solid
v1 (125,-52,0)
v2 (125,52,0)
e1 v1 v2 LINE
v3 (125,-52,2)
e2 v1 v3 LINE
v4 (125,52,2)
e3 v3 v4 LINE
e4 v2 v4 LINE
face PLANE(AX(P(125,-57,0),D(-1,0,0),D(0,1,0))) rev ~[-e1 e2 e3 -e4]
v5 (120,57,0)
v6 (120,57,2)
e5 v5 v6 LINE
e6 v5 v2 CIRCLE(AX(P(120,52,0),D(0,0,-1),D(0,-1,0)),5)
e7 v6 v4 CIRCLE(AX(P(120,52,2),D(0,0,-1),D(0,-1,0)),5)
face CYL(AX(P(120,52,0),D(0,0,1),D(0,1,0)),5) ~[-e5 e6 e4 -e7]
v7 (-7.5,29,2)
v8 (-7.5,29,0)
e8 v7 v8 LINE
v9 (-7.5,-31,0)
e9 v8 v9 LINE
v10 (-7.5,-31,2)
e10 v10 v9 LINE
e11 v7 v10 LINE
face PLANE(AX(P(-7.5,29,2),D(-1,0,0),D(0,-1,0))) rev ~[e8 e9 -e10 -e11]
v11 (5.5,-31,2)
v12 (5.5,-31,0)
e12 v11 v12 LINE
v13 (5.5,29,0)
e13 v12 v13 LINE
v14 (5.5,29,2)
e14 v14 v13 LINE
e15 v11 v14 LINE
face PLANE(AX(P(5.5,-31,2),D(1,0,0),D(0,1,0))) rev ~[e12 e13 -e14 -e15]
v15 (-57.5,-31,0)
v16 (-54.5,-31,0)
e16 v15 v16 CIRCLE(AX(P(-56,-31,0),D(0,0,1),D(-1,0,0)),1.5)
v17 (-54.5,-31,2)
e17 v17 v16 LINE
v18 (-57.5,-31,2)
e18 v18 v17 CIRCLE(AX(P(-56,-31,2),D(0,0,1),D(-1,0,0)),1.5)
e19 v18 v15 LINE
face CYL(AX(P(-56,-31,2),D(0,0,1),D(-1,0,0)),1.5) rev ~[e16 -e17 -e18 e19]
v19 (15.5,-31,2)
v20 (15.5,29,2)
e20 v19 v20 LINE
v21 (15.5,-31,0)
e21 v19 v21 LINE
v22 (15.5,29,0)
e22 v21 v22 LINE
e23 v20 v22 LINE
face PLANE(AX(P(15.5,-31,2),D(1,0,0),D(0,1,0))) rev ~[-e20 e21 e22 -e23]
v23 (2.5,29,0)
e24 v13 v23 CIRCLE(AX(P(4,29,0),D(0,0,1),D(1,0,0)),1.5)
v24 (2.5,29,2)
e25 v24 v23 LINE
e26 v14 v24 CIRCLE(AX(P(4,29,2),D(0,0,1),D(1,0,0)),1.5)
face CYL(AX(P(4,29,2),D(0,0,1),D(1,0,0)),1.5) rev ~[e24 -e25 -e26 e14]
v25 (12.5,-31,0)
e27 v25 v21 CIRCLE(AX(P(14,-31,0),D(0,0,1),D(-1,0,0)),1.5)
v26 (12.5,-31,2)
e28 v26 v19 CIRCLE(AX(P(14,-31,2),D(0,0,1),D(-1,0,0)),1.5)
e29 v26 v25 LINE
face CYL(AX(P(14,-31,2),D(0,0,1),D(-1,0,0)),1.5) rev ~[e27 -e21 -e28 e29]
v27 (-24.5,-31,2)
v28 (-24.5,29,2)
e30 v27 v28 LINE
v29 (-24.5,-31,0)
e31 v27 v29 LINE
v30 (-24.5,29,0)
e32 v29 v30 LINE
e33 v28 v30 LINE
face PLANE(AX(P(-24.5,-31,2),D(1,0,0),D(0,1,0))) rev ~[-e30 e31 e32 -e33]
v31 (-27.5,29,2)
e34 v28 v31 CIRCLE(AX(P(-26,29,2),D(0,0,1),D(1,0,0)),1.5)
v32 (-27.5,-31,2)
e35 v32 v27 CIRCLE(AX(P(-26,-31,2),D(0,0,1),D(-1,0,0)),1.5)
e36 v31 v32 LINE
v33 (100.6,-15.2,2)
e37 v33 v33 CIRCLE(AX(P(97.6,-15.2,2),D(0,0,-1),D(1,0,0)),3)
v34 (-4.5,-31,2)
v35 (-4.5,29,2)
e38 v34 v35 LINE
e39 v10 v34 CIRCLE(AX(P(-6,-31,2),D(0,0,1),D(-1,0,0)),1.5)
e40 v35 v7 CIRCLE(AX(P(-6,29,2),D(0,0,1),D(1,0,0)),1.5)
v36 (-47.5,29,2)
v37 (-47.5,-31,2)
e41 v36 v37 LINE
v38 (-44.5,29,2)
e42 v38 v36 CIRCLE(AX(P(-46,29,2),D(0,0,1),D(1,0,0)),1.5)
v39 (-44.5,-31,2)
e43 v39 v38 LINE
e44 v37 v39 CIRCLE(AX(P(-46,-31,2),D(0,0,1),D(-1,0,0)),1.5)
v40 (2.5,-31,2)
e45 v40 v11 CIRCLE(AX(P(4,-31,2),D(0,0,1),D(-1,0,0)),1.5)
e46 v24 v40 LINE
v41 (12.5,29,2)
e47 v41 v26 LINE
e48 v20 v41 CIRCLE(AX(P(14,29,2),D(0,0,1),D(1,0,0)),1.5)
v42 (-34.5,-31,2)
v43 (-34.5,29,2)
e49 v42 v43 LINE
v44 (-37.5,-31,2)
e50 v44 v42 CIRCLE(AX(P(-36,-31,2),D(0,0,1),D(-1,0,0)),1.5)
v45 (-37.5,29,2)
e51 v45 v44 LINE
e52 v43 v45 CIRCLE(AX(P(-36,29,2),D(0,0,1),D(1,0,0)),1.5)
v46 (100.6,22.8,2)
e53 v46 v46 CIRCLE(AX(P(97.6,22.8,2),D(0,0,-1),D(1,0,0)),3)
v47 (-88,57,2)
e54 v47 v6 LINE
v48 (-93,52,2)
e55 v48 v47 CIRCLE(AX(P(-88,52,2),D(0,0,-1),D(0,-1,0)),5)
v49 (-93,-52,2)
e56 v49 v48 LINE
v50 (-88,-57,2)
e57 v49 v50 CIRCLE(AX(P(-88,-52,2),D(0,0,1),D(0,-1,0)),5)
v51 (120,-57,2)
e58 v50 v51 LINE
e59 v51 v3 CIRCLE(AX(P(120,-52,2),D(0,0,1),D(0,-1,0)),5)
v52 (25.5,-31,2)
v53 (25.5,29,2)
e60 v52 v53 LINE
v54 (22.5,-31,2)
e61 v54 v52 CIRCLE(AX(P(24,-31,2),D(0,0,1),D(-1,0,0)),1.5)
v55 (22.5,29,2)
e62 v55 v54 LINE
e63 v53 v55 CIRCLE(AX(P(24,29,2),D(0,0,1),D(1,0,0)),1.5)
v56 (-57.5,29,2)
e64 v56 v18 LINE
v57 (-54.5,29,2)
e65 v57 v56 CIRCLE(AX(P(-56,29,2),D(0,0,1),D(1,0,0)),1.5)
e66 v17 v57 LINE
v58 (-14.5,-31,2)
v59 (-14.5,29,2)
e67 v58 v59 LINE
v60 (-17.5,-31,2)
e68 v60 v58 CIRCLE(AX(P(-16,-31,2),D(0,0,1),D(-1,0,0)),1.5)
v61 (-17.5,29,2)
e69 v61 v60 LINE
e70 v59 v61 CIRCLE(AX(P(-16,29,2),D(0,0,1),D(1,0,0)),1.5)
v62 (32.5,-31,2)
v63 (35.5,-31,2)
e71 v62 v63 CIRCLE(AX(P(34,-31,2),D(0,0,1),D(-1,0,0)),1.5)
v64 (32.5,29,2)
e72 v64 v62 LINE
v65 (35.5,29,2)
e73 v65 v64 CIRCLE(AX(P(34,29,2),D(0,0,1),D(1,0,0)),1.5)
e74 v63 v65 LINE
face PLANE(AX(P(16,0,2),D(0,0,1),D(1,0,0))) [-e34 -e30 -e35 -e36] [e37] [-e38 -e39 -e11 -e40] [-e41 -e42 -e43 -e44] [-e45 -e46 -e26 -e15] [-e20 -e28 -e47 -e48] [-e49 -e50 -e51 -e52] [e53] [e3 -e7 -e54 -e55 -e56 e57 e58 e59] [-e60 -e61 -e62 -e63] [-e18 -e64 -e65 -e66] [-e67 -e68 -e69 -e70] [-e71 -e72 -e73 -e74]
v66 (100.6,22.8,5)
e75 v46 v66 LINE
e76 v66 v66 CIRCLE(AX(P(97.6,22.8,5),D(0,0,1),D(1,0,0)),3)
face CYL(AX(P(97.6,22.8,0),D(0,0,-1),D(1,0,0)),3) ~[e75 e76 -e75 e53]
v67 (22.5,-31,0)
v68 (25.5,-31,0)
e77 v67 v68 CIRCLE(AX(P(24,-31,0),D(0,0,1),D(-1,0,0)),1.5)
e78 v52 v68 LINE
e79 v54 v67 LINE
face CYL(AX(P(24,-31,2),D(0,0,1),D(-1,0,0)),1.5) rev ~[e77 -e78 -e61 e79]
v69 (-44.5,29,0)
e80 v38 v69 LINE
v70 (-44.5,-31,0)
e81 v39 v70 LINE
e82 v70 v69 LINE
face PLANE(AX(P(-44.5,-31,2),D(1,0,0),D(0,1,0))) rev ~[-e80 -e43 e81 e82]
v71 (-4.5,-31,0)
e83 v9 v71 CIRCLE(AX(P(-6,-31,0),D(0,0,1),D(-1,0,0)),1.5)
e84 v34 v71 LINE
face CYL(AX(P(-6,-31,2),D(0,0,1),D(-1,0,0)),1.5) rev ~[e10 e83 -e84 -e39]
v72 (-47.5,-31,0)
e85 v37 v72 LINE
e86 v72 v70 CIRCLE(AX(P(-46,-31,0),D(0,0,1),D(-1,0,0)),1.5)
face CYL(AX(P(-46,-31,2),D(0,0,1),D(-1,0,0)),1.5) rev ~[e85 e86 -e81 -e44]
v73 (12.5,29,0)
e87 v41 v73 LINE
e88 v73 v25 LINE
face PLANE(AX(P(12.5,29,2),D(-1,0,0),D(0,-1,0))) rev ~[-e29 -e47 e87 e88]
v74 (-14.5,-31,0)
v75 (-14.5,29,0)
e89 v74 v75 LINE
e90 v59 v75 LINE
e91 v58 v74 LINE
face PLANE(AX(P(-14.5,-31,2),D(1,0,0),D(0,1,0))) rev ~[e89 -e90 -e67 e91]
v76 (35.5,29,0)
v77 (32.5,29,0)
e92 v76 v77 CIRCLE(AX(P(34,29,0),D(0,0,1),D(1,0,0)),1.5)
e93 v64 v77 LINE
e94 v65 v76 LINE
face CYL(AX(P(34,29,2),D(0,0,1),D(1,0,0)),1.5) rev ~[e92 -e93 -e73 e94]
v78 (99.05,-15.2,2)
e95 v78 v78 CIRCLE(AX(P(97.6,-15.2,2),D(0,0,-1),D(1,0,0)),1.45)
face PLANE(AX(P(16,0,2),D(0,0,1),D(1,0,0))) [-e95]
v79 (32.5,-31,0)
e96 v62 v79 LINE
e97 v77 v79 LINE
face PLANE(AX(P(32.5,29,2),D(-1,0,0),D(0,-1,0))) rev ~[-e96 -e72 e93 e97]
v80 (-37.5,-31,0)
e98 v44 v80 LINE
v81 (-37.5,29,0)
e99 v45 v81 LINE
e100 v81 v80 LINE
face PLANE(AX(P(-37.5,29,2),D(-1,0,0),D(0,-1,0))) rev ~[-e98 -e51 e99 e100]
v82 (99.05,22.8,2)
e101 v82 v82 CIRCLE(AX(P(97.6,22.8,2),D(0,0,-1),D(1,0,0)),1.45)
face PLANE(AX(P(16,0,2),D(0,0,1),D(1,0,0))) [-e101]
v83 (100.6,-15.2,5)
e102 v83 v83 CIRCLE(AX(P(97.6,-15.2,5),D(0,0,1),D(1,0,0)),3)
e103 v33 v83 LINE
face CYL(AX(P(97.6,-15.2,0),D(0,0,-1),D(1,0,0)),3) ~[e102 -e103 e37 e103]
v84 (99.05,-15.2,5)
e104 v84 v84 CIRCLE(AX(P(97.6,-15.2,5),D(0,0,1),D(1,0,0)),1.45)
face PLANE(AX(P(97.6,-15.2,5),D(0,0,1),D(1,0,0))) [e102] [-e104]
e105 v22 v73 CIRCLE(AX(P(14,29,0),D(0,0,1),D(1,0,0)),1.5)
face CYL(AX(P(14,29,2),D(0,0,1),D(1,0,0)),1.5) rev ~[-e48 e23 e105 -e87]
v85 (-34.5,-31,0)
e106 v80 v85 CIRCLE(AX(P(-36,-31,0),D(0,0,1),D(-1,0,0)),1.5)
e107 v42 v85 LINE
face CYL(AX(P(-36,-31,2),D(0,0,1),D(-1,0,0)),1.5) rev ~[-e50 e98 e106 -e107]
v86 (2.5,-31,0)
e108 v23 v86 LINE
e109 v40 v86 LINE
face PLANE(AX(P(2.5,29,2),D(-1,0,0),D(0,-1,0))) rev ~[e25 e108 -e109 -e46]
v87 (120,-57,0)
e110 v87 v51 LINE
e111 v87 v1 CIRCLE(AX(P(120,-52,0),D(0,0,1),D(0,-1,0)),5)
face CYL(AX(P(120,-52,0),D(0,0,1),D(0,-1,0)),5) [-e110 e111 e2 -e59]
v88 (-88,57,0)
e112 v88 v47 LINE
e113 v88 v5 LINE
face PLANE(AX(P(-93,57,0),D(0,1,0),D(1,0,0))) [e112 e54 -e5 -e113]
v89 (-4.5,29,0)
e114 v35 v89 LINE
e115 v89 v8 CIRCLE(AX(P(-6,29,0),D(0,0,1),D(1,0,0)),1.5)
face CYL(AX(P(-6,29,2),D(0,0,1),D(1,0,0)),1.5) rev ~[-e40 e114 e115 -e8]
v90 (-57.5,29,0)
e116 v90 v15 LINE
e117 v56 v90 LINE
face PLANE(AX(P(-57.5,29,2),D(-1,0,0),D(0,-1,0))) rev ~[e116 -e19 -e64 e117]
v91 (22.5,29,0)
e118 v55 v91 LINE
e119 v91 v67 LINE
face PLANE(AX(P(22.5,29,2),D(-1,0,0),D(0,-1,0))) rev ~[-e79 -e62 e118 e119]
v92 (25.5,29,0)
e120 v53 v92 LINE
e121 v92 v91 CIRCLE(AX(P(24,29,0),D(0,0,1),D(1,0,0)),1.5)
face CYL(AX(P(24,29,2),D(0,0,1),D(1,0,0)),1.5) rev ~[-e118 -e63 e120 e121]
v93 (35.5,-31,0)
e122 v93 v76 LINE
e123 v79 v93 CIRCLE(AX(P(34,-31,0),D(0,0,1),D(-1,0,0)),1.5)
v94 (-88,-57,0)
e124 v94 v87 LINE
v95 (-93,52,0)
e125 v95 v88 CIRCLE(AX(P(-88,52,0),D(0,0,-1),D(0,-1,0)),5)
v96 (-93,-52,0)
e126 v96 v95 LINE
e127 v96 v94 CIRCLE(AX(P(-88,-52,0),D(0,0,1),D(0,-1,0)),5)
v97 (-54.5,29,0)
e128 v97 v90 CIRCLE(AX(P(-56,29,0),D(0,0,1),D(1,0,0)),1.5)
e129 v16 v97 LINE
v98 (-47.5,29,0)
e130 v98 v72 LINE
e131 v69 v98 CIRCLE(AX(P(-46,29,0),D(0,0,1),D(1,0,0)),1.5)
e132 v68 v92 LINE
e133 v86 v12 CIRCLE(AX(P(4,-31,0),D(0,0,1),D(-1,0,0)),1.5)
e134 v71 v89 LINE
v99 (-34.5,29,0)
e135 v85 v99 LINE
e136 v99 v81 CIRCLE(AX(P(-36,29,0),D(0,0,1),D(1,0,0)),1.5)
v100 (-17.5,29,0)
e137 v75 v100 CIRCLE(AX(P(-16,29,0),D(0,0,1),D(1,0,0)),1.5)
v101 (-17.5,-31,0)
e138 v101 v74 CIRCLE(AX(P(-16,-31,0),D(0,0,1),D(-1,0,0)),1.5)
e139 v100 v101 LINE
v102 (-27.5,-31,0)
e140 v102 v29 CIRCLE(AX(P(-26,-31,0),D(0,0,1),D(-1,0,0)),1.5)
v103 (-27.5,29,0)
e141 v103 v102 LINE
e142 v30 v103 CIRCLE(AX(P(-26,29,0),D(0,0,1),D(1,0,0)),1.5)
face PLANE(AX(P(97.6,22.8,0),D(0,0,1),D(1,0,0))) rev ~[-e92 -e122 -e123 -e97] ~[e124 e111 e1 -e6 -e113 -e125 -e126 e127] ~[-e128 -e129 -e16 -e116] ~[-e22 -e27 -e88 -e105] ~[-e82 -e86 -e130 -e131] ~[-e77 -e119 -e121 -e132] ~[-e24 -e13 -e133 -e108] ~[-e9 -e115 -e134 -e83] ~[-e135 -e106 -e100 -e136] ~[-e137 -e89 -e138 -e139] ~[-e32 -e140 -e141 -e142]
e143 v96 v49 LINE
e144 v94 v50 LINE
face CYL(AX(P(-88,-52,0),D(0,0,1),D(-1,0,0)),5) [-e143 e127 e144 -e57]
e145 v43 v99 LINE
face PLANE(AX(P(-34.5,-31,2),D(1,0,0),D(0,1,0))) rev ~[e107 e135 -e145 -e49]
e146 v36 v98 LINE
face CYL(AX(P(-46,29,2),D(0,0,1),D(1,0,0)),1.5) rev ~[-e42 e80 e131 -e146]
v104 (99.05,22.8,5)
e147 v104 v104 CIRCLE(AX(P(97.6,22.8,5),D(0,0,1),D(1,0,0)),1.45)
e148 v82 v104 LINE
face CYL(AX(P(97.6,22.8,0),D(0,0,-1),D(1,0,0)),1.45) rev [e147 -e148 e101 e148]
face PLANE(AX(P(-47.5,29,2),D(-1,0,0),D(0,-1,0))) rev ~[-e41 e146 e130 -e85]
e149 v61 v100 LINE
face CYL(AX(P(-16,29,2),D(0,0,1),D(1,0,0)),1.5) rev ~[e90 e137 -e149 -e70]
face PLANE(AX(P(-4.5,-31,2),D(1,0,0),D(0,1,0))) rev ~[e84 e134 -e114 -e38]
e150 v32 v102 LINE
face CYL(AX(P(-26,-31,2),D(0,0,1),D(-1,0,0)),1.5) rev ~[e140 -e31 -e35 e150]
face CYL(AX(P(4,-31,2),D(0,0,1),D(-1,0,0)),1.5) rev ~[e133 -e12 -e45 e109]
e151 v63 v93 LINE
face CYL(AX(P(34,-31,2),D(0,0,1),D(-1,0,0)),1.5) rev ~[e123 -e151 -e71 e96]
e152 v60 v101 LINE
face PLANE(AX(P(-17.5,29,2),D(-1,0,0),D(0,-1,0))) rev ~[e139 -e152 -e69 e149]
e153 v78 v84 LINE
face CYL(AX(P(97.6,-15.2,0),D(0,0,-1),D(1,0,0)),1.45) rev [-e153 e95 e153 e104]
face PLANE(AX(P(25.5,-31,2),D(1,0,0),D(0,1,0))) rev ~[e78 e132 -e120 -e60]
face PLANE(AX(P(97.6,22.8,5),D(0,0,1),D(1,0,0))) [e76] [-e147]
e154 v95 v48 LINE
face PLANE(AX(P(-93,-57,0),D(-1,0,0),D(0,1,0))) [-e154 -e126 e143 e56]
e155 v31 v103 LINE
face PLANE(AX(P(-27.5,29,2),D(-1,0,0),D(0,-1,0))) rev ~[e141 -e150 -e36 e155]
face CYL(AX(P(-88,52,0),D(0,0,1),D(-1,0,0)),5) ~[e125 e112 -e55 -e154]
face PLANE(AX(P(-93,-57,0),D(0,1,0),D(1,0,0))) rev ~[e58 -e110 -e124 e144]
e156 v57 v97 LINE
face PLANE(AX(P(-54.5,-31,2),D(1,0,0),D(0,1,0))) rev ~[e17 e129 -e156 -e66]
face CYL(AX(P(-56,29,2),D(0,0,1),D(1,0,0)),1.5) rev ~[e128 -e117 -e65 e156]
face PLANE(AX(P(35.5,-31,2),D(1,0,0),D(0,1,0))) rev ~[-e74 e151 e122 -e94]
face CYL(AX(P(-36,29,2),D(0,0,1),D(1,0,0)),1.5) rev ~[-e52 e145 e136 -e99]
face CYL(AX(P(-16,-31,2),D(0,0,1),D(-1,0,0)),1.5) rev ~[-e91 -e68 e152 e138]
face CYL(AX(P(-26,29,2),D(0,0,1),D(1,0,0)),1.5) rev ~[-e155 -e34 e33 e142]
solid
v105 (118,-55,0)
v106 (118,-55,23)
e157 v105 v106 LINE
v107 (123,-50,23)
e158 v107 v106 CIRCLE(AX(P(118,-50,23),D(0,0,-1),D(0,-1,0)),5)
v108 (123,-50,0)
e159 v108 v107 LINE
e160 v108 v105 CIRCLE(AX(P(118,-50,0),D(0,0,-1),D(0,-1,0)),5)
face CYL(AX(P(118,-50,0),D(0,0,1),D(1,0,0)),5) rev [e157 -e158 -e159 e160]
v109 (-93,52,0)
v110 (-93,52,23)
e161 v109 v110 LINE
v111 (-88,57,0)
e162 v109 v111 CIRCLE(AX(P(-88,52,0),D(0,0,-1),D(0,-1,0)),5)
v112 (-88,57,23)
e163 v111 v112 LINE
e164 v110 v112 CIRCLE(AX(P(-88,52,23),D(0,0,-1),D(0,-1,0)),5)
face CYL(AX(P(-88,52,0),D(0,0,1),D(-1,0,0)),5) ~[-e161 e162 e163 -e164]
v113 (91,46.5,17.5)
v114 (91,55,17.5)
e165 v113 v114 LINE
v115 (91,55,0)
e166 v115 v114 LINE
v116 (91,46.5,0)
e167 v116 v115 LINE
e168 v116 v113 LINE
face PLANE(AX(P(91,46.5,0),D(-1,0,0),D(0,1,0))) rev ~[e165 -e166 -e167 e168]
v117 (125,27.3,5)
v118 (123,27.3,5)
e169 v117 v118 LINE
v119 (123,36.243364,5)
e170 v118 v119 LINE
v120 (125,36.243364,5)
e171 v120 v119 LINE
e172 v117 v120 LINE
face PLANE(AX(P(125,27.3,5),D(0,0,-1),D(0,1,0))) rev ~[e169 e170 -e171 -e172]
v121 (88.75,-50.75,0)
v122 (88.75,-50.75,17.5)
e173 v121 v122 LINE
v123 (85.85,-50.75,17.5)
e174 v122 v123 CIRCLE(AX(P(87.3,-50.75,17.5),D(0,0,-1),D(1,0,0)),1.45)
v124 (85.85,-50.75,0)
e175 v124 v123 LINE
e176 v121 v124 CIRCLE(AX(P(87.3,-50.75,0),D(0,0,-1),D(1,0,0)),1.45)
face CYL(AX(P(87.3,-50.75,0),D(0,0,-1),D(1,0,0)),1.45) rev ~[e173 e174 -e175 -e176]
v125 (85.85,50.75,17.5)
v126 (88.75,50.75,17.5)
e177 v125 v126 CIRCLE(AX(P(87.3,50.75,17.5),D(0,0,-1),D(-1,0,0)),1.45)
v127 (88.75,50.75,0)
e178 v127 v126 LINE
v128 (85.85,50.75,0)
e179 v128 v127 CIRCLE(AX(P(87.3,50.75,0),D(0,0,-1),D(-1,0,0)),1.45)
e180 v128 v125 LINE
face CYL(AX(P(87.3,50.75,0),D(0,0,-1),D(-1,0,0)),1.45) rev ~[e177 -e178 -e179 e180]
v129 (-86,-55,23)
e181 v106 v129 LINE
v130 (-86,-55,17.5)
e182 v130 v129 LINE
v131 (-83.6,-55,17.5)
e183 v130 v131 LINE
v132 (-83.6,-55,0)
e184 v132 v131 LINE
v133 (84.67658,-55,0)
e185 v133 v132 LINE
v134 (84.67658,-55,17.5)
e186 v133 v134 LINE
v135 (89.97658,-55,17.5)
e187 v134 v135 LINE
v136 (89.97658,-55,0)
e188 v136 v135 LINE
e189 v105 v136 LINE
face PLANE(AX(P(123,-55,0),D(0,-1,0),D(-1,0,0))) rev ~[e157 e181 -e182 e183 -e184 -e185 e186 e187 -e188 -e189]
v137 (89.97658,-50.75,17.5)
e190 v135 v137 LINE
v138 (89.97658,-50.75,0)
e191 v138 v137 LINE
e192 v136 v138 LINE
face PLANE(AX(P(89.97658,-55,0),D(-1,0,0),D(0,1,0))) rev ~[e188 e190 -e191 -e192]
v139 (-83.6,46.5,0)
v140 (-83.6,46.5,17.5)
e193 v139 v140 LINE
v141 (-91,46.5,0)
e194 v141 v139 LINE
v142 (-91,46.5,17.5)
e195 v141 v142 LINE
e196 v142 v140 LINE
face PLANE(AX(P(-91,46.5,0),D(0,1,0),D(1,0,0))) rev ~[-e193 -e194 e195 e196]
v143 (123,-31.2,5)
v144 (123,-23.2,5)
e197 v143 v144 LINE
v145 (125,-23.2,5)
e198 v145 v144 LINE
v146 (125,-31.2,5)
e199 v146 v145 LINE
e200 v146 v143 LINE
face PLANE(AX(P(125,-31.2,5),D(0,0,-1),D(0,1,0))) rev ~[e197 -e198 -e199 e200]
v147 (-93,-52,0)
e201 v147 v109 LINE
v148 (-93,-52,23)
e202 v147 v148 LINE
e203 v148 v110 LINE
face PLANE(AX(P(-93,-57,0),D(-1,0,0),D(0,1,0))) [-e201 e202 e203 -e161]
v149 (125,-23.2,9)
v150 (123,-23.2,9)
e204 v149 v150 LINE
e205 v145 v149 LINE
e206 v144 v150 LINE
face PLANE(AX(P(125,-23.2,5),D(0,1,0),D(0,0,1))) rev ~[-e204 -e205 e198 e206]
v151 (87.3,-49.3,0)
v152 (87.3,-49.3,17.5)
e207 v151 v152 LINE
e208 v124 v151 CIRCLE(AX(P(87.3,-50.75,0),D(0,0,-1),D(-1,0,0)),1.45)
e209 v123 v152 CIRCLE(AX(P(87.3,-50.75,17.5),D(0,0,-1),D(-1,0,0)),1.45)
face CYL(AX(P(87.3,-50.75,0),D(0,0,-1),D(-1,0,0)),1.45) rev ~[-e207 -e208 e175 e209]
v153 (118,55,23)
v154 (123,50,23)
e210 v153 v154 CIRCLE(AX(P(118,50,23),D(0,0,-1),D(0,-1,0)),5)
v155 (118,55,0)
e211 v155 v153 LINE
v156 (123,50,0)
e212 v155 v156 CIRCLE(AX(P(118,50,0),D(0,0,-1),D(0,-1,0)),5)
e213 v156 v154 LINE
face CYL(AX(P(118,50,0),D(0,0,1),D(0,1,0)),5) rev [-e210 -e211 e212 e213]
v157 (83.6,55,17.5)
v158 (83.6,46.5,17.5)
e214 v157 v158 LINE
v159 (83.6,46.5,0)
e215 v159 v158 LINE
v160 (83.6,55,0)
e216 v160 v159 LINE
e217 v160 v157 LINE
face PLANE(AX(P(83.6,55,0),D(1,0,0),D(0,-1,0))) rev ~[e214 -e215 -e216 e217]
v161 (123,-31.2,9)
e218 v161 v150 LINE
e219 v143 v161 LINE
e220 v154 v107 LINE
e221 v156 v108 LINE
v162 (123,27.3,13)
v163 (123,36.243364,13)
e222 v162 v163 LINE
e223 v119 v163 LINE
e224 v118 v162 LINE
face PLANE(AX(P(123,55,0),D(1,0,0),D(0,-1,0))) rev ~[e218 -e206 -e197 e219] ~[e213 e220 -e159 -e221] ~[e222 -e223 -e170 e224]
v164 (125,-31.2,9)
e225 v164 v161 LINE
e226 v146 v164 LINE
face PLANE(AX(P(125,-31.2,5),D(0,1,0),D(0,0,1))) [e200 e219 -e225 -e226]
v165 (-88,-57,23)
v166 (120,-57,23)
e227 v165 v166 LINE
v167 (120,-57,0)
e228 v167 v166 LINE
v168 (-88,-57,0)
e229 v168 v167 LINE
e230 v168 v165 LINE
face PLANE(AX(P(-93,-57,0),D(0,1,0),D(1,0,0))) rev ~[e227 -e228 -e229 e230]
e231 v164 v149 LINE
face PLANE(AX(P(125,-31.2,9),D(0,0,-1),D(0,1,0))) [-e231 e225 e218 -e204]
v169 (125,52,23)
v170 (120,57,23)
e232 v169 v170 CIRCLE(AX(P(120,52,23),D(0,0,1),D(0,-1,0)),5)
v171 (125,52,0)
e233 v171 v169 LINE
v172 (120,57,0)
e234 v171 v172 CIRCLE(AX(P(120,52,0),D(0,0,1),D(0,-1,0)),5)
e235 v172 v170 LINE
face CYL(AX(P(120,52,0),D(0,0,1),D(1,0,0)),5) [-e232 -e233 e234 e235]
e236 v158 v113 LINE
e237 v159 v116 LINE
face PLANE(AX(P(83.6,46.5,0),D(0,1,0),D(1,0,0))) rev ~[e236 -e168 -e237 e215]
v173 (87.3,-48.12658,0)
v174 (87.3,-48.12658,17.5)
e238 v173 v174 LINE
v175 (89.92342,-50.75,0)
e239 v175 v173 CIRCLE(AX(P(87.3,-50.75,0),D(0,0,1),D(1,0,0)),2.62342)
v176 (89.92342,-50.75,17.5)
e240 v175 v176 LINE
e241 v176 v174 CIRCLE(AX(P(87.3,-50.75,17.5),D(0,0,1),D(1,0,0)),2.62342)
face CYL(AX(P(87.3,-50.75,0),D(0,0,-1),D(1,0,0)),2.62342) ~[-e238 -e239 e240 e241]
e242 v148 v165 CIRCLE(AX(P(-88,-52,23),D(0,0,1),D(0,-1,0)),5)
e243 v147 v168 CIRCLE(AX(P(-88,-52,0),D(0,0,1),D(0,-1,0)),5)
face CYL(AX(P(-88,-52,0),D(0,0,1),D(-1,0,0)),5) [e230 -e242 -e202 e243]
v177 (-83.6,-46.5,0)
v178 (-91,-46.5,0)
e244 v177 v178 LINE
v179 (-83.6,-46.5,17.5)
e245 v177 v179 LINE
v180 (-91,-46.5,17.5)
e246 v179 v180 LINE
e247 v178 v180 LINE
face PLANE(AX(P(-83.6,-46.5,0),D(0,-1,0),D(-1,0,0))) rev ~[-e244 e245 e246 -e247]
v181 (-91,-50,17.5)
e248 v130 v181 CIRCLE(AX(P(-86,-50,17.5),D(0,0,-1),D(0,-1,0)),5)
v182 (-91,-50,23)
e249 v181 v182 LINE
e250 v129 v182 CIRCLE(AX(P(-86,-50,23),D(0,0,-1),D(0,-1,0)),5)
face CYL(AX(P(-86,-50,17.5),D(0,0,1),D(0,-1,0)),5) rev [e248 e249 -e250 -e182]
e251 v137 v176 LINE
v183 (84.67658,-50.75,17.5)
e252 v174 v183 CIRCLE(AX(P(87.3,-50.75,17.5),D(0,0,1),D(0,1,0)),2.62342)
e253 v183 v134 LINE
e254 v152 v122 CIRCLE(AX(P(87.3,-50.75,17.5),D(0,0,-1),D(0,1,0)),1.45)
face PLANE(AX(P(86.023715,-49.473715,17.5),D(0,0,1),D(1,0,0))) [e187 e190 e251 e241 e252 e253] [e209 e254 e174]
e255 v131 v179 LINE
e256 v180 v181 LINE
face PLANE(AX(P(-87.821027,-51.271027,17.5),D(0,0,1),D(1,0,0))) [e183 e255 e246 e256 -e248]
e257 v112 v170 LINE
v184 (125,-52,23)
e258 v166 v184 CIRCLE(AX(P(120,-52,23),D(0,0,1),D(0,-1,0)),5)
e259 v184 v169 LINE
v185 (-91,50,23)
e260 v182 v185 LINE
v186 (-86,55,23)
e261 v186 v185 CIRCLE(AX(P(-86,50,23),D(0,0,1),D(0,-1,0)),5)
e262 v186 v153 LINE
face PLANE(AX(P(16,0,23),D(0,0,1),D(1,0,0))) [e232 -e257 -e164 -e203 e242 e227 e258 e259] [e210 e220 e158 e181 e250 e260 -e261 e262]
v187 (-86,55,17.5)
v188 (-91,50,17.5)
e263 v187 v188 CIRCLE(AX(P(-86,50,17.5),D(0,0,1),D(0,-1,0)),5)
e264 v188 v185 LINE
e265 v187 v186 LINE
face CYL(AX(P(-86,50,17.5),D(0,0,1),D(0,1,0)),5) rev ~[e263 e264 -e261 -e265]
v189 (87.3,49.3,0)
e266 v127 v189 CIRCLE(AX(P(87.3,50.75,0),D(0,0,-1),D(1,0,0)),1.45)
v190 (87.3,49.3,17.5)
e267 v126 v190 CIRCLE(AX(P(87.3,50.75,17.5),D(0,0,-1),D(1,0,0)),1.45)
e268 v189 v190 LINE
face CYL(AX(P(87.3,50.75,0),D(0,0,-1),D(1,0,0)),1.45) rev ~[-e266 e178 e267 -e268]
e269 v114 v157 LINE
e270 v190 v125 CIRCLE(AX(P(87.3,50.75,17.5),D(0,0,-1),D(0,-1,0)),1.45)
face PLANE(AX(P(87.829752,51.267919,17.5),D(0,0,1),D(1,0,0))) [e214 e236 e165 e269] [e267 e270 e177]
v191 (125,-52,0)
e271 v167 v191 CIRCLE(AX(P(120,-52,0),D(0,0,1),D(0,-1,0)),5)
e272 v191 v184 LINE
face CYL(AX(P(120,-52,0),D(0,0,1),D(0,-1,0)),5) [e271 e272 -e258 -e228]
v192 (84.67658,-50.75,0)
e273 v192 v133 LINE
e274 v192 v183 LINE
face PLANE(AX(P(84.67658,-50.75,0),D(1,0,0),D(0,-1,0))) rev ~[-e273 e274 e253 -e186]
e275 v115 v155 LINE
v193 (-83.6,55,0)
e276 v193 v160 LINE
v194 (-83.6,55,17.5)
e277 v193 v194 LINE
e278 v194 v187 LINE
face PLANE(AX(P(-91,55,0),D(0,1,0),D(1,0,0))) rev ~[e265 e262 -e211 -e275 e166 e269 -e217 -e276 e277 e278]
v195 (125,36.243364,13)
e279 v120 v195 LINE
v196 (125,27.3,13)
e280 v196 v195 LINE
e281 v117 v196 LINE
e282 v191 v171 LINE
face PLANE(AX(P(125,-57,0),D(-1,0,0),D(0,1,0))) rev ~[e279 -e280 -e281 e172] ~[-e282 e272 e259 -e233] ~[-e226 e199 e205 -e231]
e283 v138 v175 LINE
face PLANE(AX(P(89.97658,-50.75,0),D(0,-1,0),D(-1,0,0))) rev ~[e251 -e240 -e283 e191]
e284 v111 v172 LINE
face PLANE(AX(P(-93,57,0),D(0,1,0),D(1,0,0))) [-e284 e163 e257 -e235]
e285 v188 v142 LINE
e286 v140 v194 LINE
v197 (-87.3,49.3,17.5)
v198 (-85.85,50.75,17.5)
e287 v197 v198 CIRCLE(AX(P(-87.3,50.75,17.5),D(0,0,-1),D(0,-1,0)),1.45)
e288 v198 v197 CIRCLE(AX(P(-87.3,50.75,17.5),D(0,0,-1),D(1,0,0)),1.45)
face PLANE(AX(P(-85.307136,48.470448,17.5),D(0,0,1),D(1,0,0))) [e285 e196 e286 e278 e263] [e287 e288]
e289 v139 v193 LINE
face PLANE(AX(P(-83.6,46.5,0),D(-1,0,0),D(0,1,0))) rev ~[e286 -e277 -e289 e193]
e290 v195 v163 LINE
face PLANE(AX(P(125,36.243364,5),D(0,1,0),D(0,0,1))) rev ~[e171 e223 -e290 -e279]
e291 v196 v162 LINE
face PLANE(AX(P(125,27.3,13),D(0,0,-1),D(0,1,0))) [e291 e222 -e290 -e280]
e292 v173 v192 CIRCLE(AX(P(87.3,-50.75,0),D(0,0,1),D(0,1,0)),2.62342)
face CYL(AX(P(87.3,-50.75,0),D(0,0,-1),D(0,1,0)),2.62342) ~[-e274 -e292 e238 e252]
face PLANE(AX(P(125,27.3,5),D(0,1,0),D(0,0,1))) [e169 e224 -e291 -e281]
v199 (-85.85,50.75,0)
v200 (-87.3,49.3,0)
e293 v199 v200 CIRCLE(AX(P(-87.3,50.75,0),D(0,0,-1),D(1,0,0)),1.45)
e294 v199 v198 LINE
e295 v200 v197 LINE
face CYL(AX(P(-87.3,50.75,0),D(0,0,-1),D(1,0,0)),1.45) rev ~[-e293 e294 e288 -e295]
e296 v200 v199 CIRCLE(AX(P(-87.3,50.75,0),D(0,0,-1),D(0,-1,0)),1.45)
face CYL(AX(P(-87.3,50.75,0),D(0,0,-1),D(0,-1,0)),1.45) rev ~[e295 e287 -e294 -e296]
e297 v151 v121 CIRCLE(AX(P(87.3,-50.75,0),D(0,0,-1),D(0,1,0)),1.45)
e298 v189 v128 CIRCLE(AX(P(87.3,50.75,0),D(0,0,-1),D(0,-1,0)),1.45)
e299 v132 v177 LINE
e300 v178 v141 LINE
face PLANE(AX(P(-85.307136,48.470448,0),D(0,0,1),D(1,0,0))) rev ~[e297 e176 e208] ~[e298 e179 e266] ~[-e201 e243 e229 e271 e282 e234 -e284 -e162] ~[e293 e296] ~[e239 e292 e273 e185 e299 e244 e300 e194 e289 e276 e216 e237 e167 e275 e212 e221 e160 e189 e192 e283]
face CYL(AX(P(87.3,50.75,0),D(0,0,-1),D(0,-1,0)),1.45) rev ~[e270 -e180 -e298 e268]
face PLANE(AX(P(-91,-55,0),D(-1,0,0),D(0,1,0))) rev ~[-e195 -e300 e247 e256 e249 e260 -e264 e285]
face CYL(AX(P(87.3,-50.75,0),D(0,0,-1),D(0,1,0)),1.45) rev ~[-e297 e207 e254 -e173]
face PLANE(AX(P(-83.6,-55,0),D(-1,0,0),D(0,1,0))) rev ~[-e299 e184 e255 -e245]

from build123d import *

# Parameters (mm, degrees)
F0_W      = 218
F0_H      = 114
F0_R      = 3
F0_R_2    = 1.75
F0_W_2    = 168.2765804879
F0_H_2    = 4.25
F0_W_3    = 167.2
F0_W_4    = 3.7
F0_H_3    = 93
F0_R_3    = 1.45
F1_DEPTH  = 2
F2_DEPTH  = 5
F3_DEPTH  = 23
F4_DEPTH  = 17.5
F7_W      = 8
F7_H      = 4
F7_W_2    = 8.9433642089
F7_H_2    = 8
F8_DEPTH  = 2
F9_R      = 5
F9_2_R    = 5
F10_R     = 5
F12_DEPTH = 2


# Not quite as in the source:
# - a feature of the source that left no trace in its solid (it failed there, or was rolled back) is left out


with BuildPart() as f1:
    # F0 (on Top) → F1 (new body)
    with BuildSketch(Plane.XY):
        with Locations((16, 0)):
            Rectangle(F0_W, F0_H)
        Polygon((84.6765804879, -55), (-83.6, -55), (-91, -55), (-91, -46.5), (-91, 46.5), (-91, 55), (-83.6, 55), (83.6, 55), (91, 55), (123, 55), (123, -55), (91, -55), (89.9765804879, -55), align=None, mode=Mode.SUBTRACT)
        with BuildLine():
            Line((-83.6, -46.5), (-83.6, -50.75))
            Line((-83.6, -50.75), (84.6765804879, -50.75))
            ThreePointArc((84.6765804879, -50.75), (85.4449622731, -48.8949622731), (87.3, -48.1265804879))
            Line((87.3, -48.1265804879), (87.3, 46.5))
            Line((87.3, 46.5), (83.6, 46.5))
            Line((83.6, 46.5), (83.6, 50.75))
            Line((83.6, 50.75), (-83.6, 50.75))
            Line((-83.6, 50.75), (-83.6, 46.5))
            Line((-83.6, 46.5), (-87.3, 46.5))
            Line((-87.3, 46.5), (-87.3, -46.5))
            Line((-87.3, -46.5), (-83.6, -46.5))
        make_face()
        with BuildLine():
            ThreePointArc((87.3, -48.1265804879), (89.1550377269, -48.8949622731), (89.9234195121, -50.75))
            Line((89.9234195121, -50.75), (89.9765804879, -50.75))
            Line((89.9765804879, -50.75), (89.9765804879, -55))
            Line((89.9765804879, -55), (91, -55))
            Line((91, -55), (123, -55))
            Line((123, -55), (123, 55))
            Line((123, 55), (91, 55))
            Line((91, 55), (91, 46.5))
            Line((91, 46.5), (87.3, 46.5))
            Line((87.3, 46.5), (87.3, -48.1265804879))
        make_face()
        with Locations((97.6, -15.2)):
            Circle(F0_R, mode=Mode.SUBTRACT)
        with Locations((101, -27.2)):
            Circle(F0_R_2, mode=Mode.SUBTRACT)
        with Locations((117, -8.2)):
            Circle(F0_R_2, mode=Mode.SUBTRACT)
        with Locations((97.6, 22.8)):
            Circle(F0_R, mode=Mode.SUBTRACT)
        with Locations((0.538290244, -52.875)):
            Rectangle(F0_W_2, F0_H_2)
        with Locations((0, 52.875)):
            Rectangle(F0_W_3, F0_H_2)
        with Locations((-89.15, 0)):
            Rectangle(F0_W_4, F0_H_3)
        with BuildLine():
            Line((-83.6, -50.75), (-85.85, -50.75))
            ThreePointArc((-85.85, -50.75), (-88.3253048327, -51.7753048327), (-87.3, -49.3))
            Line((-87.3, -49.3), (-87.3, -46.5))
            Line((-87.3, -46.5), (-91, -46.5))
            Line((-91, -46.5), (-91, -55))
            Line((-91, -55), (-83.6, -55))
            Line((-83.6, -55), (-83.6, -50.75))
        make_face()
        with BuildLine():
            Line((87.3, 49.3), (87.3, 46.5))
            Line((87.3, 46.5), (91, 46.5))
            Line((91, 46.5), (91, 55))
            Line((91, 55), (83.6, 55))
            Line((83.6, 55), (83.6, 50.75))
            Line((83.6, 50.75), (85.85, 50.75))
            ThreePointArc((85.85, 50.75), (87.3, 52.2), (88.75, 50.75))
            ThreePointArc((88.75, 50.75), (88.3253048327, 49.7246951673), (87.3, 49.3))
        make_face()
        with BuildLine():
            Line((-91, 46.5), (-87.3, 46.5))
            Line((-87.3, 46.5), (-87.3, 49.3))
            ThreePointArc((-87.3, 49.3), (-88.3253048327, 51.7753048327), (-85.85, 50.75))
            Line((-85.85, 50.75), (-83.6, 50.75))
            Line((-83.6, 50.75), (-83.6, 55))
            Line((-83.6, 55), (-91, 55))
            Line((-91, 55), (-91, 46.5))
        make_face()
        with Locations((97.6, -15.2)):
            Circle(F0_R)
        with Locations((97.6, -15.2)):
            Circle(F0_R_3, mode=Mode.SUBTRACT)
        with Locations((97.6, 22.8)):
            Circle(F0_R)
        with Locations((97.6, 22.8)):
            Circle(F0_R_3, mode=Mode.SUBTRACT)
        with BuildLine():
            ThreePointArc((-87.3, -49.3), (-86.2746951673, -49.7246951673), (-85.85, -50.75))
            Line((-85.85, -50.75), (-83.6, -50.75))
            Line((-83.6, -50.75), (-83.6, -46.5))
            Line((-83.6, -46.5), (-87.3, -46.5))
            Line((-87.3, -46.5), (-87.3, -49.3))
        make_face()
        with BuildLine():
            Line((-87.3, 49.3), (-87.3, 46.5))
            Line((-87.3, 46.5), (-83.6, 46.5))
            Line((-83.6, 46.5), (-83.6, 50.75))
            Line((-83.6, 50.75), (-85.85, 50.75))
            ThreePointArc((-85.85, 50.75), (-86.2746951673, 49.7246951673), (-87.3, 49.3))
        make_face()
        with BuildLine():
            Line((83.6, 46.5), (87.3, 46.5))
            Line((87.3, 46.5), (87.3, 49.3))
            ThreePointArc((87.3, 49.3), (86.2746951673, 49.7246951673), (85.85, 50.75))
            Line((85.85, 50.75), (83.6, 50.75))
            Line((83.6, 50.75), (83.6, 46.5))
        make_face()
        with BuildLine():
            ThreePointArc((89.9234195121, -50.75), (87.3, -53.3734195121), (84.6765804879, -50.75))
            Line((84.6765804879, -50.75), (84.6765804879, -55))
            Line((84.6765804879, -55), (89.9765804879, -55))
            Line((89.9765804879, -55), (89.9765804879, -50.75))
            Line((89.9765804879, -50.75), (89.9234195121, -50.75))
        make_face()
        with Locations((117, -8.2)):
            Circle(F0_R_2)
        with Locations((101, -27.2)):
            Circle(F0_R_2)
        with BuildLine():
            Line((85.85, -50.75), (84.6765804879, -50.75))
            ThreePointArc((84.6765804879, -50.75), (87.3, -53.3734195121), (89.9234195121, -50.75))
            Line((89.9234195121, -50.75), (88.75, -50.75))
            ThreePointArc((88.75, -50.75), (87.3, -52.2), (85.85, -50.75))
        make_face()
        with Locations((97.6, -15.2)):
            Circle(F0_R_3)
        with Locations((97.6, 22.8)):
            Circle(F0_R_3)
        with BuildLine():
            ThreePointArc((-87.3, -49.3), (-88.3253048327, -51.7753048327), (-85.85, -50.75))
            Line((-85.85, -50.75), (-87.3, -50.75))
            Line((-87.3, -50.75), (-87.3, -49.3))
        make_face()
        with BuildLine():
            Line((87.3, 50.75), (87.3, 49.3))
            ThreePointArc((87.3, 49.3), (88.3253048327, 49.7246951673), (88.75, 50.75))
            ThreePointArc((88.75, 50.75), (87.3, 52.2), (85.85, 50.75))
            Line((85.85, 50.75), (87.3, 50.75))
        make_face()
        with BuildLine():
            ThreePointArc((-85.85, 50.75), (-88.3253048327, 51.7753048327), (-87.3, 49.3))
            Line((-87.3, 49.3), (-87.3, 50.75))
            Line((-87.3, 50.75), (-85.85, 50.75))
        make_face()
        with BuildLine():
            ThreePointArc((87.3, -48.1265804879), (85.4449622731, -48.8949622731), (84.6765804879, -50.75))
            Line((84.6765804879, -50.75), (85.85, -50.75))
            ThreePointArc((85.85, -50.75), (86.2746951673, -49.7246951673), (87.3, -49.3))
            Line((87.3, -49.3), (87.3, -48.1265804879))
        make_face()
        with BuildLine():
            Line((88.75, -50.75), (89.9234195121, -50.75))
            ThreePointArc((89.9234195121, -50.75), (89.1550377269, -48.8949622731), (87.3, -48.1265804879))
            Line((87.3, -48.1265804879), (87.3, -49.3))
            ThreePointArc((87.3, -49.3), (88.3253048327, -49.7246951673), (88.75, -50.75))
        make_face()
        with BuildLine():
            Line((87.3, -50.75), (85.85, -50.75))
            ThreePointArc((85.85, -50.75), (87.3, -52.2), (88.75, -50.75))
            Line((88.75, -50.75), (87.3, -50.75))
        make_face()
        with BuildLine():
            Line((-87.3, -50.75), (-85.85, -50.75))
            ThreePointArc((-85.85, -50.75), (-86.2746951673, -49.7246951673), (-87.3, -49.3))
            Line((-87.3, -49.3), (-87.3, -50.75))
        make_face()
        with BuildLine():
            Line((-87.3, 50.75), (-87.3, 49.3))
            ThreePointArc((-87.3, 49.3), (-86.2746951673, 49.7246951673), (-85.85, 50.75))
            Line((-85.85, 50.75), (-87.3, 50.75))
        make_face()
        with BuildLine():
            ThreePointArc((85.85, 50.75), (86.2746951673, 49.7246951673), (87.3, 49.3))
            Line((87.3, 49.3), (87.3, 50.75))
            Line((87.3, 50.75), (85.85, 50.75))
        make_face()
        with BuildLine():
            ThreePointArc((87.3, -49.3), (86.2746951673, -49.7246951673), (85.85, -50.75))
            Line((85.85, -50.75), (87.3, -50.75))
            Line((87.3, -50.75), (87.3, -49.3))
        make_face()
        with BuildLine():
            Line((87.3, -49.3), (87.3, -50.75))
            Line((87.3, -50.75), (88.75, -50.75))
            ThreePointArc((88.75, -50.75), (88.3253048327, -49.7246951673), (87.3, -49.3))
        make_face()
    extrude(amount=F1_DEPTH)

    # F0 (on Top) → F2 (join)
    with BuildSketch(Plane.XY):
        with Locations((97.6, 22.8)):
            Circle(F0_R)
        with Locations((97.6, 22.8)):
            Circle(F0_R_3, mode=Mode.SUBTRACT)
        with Locations((97.6, -15.2)):
            Circle(F0_R)
        with Locations((97.6, -15.2)):
            Circle(F0_R_3, mode=Mode.SUBTRACT)
    extrude(amount=F2_DEPTH)

    # F9
    f9_edges = [f1.edges().sort_by_distance(p)[0] for p in [
        (-93, -57, 1),
        (-93, 57, 1),
        (125, 57, 1),
        (125, -57, 1),
    ]]
    fillet(f9_edges, radius=F9_R)

    # F11 (on face) → F12 (cut, through all)
    with BuildSketch(Plane.XY.offset(2)):
        with BuildLine():
            ThreePointArc((-54.5, 29), (-56, 30.5), (-57.5, 29))
            Line((-57.5, 29), (-57.5, -31))
            ThreePointArc((-57.5, -31), (-56, -32.5), (-54.5, -31))
            Line((-54.5, -31), (-54.5, 29))
        make_face()
        with BuildLine():
            Line((-44.5, -31), (-44.5, 29))
            ThreePointArc((-44.5, 29), (-46, 30.5), (-47.5, 29))
            Line((-47.5, 29), (-47.5, -31))
            ThreePointArc((-47.5, -31), (-46, -32.5), (-44.5, -31))
        make_face()
        with BuildLine():
            Line((-34.5, -31), (-34.5, 29))
            ThreePointArc((-34.5, 29), (-36, 30.5), (-37.5, 29))
            Line((-37.5, 29), (-37.5, -31))
            ThreePointArc((-37.5, -31), (-36, -32.5), (-34.5, -31))
        make_face()
        with BuildLine():
            Line((-24.5, -31), (-24.5, 29))
            ThreePointArc((-24.5, 29), (-26, 30.5), (-27.5, 29))
            Line((-27.5, 29), (-27.5, -31))
            ThreePointArc((-27.5, -31), (-26, -32.5), (-24.5, -31))
        make_face()
        with BuildLine():
            Line((-14.5, -31), (-14.5, 29))
            ThreePointArc((-14.5, 29), (-16, 30.5), (-17.5, 29))
            Line((-17.5, 29), (-17.5, -31))
            ThreePointArc((-17.5, -31), (-16, -32.5), (-14.5, -31))
        make_face()
        with BuildLine():
            Line((-4.5, -31), (-4.5, 29))
            ThreePointArc((-4.5, 29), (-6, 30.5), (-7.5, 29))
            Line((-7.5, 29), (-7.5, -31))
            ThreePointArc((-7.5, -31), (-6, -32.5), (-4.5, -31))
        make_face()
        with BuildLine():
            Line((5.5, -31), (5.5, 29))
            ThreePointArc((5.5, 29), (4, 30.5), (2.5, 29))
            Line((2.5, 29), (2.5, -31))
            ThreePointArc((2.5, -31), (4, -32.5), (5.5, -31))
        make_face()
        with BuildLine():
            Line((15.5, -31), (15.5, 29))
            ThreePointArc((15.5, 29), (14, 30.5), (12.5, 29))
            Line((12.5, 29), (12.5, -31))
            ThreePointArc((12.5, -31), (14, -32.5), (15.5, -31))
        make_face()
        with BuildLine():
            Line((25.5, -31), (25.5, 29))
            ThreePointArc((25.5, 29), (24, 30.5), (22.5, 29))
            Line((22.5, 29), (22.5, -31))
            ThreePointArc((22.5, -31), (24, -32.5), (25.5, -31))
        make_face()
        with BuildLine():
            Line((35.5, -31), (35.5, 29))
            ThreePointArc((35.5, 29), (34, 30.5), (32.5, 29))
            Line((32.5, 29), (32.5, -31))
            ThreePointArc((32.5, -31), (34, -32.5), (35.5, -31))
        make_face()
    extrude(amount=-F12_DEPTH, mode=Mode.SUBTRACT)


with BuildPart() as f3:
    # F0 (on Top) → F3 (new body)
    with BuildSketch(Plane.XY):
        with Locations((16, 0)):
            Rectangle(F0_W, F0_H)
        Polygon((84.6765804879, -55), (-83.6, -55), (-91, -55), (-91, -46.5), (-91, 46.5), (-91, 55), (-83.6, 55), (83.6, 55), (91, 55), (123, 55), (123, -55), (91, -55), (89.9765804879, -55), align=None, mode=Mode.SUBTRACT)
    extrude(amount=F3_DEPTH)

    # F0 (on Top) → F4 (join)
    with BuildSketch(Plane.XY):
        with BuildLine():
            Line((-87.3, 49.3), (-87.3, 46.5))
            Line((-87.3, 46.5), (-83.6, 46.5))
            Line((-83.6, 46.5), (-83.6, 50.75))
            Line((-83.6, 50.75), (-85.85, 50.75))
            ThreePointArc((-85.85, 50.75), (-86.2746951673, 49.7246951673), (-87.3, 49.3))
        make_face()
        with BuildLine():
            Line((-91, 46.5), (-87.3, 46.5))
            Line((-87.3, 46.5), (-87.3, 49.3))
            ThreePointArc((-87.3, 49.3), (-88.3253048327, 51.7753048327), (-85.85, 50.75))
            Line((-85.85, 50.75), (-83.6, 50.75))
            Line((-83.6, 50.75), (-83.6, 55))
            Line((-83.6, 55), (-91, 55))
            Line((-91, 55), (-91, 46.5))
        make_face()
        with BuildLine():
            Line((-83.6, -50.75), (-85.85, -50.75))
            ThreePointArc((-85.85, -50.75), (-88.3253048327, -51.7753048327), (-87.3, -49.3))
            Line((-87.3, -49.3), (-87.3, -46.5))
            Line((-87.3, -46.5), (-91, -46.5))
            Line((-91, -46.5), (-91, -55))
            Line((-91, -55), (-83.6, -55))
            Line((-83.6, -55), (-83.6, -50.75))
        make_face()
        with BuildLine():
            ThreePointArc((-87.3, -49.3), (-86.2746951673, -49.7246951673), (-85.85, -50.75))
            Line((-85.85, -50.75), (-83.6, -50.75))
            Line((-83.6, -50.75), (-83.6, -46.5))
            Line((-83.6, -46.5), (-87.3, -46.5))
            Line((-87.3, -46.5), (-87.3, -49.3))
        make_face()
        with BuildLine():
            ThreePointArc((-87.3, -49.3), (-88.3253048327, -51.7753048327), (-85.85, -50.75))
            Line((-85.85, -50.75), (-87.3, -50.75))
            Line((-87.3, -50.75), (-87.3, -49.3))
        make_face()
        with BuildLine():
            Line((-87.3, -50.75), (-85.85, -50.75))
            ThreePointArc((-85.85, -50.75), (-86.2746951673, -49.7246951673), (-87.3, -49.3))
            Line((-87.3, -49.3), (-87.3, -50.75))
        make_face()
        with BuildLine():
            Line((87.3, 49.3), (87.3, 46.5))
            Line((87.3, 46.5), (91, 46.5))
            Line((91, 46.5), (91, 55))
            Line((91, 55), (83.6, 55))
            Line((83.6, 55), (83.6, 50.75))
            Line((83.6, 50.75), (85.85, 50.75))
            ThreePointArc((85.85, 50.75), (87.3, 52.2), (88.75, 50.75))
            ThreePointArc((88.75, 50.75), (88.3253048327, 49.7246951673), (87.3, 49.3))
        make_face()
        with BuildLine():
            Line((83.6, 46.5), (87.3, 46.5))
            Line((87.3, 46.5), (87.3, 49.3))
            ThreePointArc((87.3, 49.3), (86.2746951673, 49.7246951673), (85.85, 50.75))
            Line((85.85, 50.75), (83.6, 50.75))
            Line((83.6, 50.75), (83.6, 46.5))
        make_face()
        with BuildLine():
            ThreePointArc((87.3, -48.1265804879), (85.4449622731, -48.8949622731), (84.6765804879, -50.75))
            Line((84.6765804879, -50.75), (85.85, -50.75))
            ThreePointArc((85.85, -50.75), (86.2746951673, -49.7246951673), (87.3, -49.3))
            Line((87.3, -49.3), (87.3, -48.1265804879))
        make_face()
        with BuildLine():
            Line((88.75, -50.75), (89.9234195121, -50.75))
            ThreePointArc((89.9234195121, -50.75), (89.1550377269, -48.8949622731), (87.3, -48.1265804879))
            Line((87.3, -48.1265804879), (87.3, -49.3))
            ThreePointArc((87.3, -49.3), (88.3253048327, -49.7246951673), (88.75, -50.75))
        make_face()
        with BuildLine():
            Line((85.85, -50.75), (84.6765804879, -50.75))
            ThreePointArc((84.6765804879, -50.75), (87.3, -53.3734195121), (89.9234195121, -50.75))
            Line((89.9234195121, -50.75), (88.75, -50.75))
            ThreePointArc((88.75, -50.75), (87.3, -52.2), (85.85, -50.75))
        make_face()
        with BuildLine():
            ThreePointArc((89.9234195121, -50.75), (87.3, -53.3734195121), (84.6765804879, -50.75))
            Line((84.6765804879, -50.75), (84.6765804879, -55))
            Line((84.6765804879, -55), (89.9765804879, -55))
            Line((89.9765804879, -55), (89.9765804879, -50.75))
            Line((89.9765804879, -50.75), (89.9234195121, -50.75))
        make_face()
    extrude(amount=F4_DEPTH)

    # F7 (on face) → F8 (cut, through all)
    with BuildSketch(Plane.YZ.offset(125)):
        with Locations((-27.2, 7)):
            Rectangle(F7_W, F7_H)
        with Locations((31.7716821045, 9)):
            Rectangle(F7_W_2, F7_H_2)
    extrude(amount=-F8_DEPTH, mode=Mode.SUBTRACT)

    # F9#2
    f9_2_edges = [f3.edges().sort_by_distance(p)[0] for p in [
        (-93, -57, 11.5),
        (-93, 57, 11.5),
        (125, 57, 11.5),
        (125, -57, 11.5),
    ]]
    fillet(f9_2_edges, radius=F9_2_R)

    # F10
    f10_edges = [f3.edges().sort_by_distance(p)[0] for p in [
        (-91, 55, 20.25),
        (123, 55, 11.5),
        (123, -55, 11.5),
        (-91, -55, 20.25),
    ]]
    fillet(f10_edges, radius=F10_R)


solid = Compound([f1.part, f3.part])
